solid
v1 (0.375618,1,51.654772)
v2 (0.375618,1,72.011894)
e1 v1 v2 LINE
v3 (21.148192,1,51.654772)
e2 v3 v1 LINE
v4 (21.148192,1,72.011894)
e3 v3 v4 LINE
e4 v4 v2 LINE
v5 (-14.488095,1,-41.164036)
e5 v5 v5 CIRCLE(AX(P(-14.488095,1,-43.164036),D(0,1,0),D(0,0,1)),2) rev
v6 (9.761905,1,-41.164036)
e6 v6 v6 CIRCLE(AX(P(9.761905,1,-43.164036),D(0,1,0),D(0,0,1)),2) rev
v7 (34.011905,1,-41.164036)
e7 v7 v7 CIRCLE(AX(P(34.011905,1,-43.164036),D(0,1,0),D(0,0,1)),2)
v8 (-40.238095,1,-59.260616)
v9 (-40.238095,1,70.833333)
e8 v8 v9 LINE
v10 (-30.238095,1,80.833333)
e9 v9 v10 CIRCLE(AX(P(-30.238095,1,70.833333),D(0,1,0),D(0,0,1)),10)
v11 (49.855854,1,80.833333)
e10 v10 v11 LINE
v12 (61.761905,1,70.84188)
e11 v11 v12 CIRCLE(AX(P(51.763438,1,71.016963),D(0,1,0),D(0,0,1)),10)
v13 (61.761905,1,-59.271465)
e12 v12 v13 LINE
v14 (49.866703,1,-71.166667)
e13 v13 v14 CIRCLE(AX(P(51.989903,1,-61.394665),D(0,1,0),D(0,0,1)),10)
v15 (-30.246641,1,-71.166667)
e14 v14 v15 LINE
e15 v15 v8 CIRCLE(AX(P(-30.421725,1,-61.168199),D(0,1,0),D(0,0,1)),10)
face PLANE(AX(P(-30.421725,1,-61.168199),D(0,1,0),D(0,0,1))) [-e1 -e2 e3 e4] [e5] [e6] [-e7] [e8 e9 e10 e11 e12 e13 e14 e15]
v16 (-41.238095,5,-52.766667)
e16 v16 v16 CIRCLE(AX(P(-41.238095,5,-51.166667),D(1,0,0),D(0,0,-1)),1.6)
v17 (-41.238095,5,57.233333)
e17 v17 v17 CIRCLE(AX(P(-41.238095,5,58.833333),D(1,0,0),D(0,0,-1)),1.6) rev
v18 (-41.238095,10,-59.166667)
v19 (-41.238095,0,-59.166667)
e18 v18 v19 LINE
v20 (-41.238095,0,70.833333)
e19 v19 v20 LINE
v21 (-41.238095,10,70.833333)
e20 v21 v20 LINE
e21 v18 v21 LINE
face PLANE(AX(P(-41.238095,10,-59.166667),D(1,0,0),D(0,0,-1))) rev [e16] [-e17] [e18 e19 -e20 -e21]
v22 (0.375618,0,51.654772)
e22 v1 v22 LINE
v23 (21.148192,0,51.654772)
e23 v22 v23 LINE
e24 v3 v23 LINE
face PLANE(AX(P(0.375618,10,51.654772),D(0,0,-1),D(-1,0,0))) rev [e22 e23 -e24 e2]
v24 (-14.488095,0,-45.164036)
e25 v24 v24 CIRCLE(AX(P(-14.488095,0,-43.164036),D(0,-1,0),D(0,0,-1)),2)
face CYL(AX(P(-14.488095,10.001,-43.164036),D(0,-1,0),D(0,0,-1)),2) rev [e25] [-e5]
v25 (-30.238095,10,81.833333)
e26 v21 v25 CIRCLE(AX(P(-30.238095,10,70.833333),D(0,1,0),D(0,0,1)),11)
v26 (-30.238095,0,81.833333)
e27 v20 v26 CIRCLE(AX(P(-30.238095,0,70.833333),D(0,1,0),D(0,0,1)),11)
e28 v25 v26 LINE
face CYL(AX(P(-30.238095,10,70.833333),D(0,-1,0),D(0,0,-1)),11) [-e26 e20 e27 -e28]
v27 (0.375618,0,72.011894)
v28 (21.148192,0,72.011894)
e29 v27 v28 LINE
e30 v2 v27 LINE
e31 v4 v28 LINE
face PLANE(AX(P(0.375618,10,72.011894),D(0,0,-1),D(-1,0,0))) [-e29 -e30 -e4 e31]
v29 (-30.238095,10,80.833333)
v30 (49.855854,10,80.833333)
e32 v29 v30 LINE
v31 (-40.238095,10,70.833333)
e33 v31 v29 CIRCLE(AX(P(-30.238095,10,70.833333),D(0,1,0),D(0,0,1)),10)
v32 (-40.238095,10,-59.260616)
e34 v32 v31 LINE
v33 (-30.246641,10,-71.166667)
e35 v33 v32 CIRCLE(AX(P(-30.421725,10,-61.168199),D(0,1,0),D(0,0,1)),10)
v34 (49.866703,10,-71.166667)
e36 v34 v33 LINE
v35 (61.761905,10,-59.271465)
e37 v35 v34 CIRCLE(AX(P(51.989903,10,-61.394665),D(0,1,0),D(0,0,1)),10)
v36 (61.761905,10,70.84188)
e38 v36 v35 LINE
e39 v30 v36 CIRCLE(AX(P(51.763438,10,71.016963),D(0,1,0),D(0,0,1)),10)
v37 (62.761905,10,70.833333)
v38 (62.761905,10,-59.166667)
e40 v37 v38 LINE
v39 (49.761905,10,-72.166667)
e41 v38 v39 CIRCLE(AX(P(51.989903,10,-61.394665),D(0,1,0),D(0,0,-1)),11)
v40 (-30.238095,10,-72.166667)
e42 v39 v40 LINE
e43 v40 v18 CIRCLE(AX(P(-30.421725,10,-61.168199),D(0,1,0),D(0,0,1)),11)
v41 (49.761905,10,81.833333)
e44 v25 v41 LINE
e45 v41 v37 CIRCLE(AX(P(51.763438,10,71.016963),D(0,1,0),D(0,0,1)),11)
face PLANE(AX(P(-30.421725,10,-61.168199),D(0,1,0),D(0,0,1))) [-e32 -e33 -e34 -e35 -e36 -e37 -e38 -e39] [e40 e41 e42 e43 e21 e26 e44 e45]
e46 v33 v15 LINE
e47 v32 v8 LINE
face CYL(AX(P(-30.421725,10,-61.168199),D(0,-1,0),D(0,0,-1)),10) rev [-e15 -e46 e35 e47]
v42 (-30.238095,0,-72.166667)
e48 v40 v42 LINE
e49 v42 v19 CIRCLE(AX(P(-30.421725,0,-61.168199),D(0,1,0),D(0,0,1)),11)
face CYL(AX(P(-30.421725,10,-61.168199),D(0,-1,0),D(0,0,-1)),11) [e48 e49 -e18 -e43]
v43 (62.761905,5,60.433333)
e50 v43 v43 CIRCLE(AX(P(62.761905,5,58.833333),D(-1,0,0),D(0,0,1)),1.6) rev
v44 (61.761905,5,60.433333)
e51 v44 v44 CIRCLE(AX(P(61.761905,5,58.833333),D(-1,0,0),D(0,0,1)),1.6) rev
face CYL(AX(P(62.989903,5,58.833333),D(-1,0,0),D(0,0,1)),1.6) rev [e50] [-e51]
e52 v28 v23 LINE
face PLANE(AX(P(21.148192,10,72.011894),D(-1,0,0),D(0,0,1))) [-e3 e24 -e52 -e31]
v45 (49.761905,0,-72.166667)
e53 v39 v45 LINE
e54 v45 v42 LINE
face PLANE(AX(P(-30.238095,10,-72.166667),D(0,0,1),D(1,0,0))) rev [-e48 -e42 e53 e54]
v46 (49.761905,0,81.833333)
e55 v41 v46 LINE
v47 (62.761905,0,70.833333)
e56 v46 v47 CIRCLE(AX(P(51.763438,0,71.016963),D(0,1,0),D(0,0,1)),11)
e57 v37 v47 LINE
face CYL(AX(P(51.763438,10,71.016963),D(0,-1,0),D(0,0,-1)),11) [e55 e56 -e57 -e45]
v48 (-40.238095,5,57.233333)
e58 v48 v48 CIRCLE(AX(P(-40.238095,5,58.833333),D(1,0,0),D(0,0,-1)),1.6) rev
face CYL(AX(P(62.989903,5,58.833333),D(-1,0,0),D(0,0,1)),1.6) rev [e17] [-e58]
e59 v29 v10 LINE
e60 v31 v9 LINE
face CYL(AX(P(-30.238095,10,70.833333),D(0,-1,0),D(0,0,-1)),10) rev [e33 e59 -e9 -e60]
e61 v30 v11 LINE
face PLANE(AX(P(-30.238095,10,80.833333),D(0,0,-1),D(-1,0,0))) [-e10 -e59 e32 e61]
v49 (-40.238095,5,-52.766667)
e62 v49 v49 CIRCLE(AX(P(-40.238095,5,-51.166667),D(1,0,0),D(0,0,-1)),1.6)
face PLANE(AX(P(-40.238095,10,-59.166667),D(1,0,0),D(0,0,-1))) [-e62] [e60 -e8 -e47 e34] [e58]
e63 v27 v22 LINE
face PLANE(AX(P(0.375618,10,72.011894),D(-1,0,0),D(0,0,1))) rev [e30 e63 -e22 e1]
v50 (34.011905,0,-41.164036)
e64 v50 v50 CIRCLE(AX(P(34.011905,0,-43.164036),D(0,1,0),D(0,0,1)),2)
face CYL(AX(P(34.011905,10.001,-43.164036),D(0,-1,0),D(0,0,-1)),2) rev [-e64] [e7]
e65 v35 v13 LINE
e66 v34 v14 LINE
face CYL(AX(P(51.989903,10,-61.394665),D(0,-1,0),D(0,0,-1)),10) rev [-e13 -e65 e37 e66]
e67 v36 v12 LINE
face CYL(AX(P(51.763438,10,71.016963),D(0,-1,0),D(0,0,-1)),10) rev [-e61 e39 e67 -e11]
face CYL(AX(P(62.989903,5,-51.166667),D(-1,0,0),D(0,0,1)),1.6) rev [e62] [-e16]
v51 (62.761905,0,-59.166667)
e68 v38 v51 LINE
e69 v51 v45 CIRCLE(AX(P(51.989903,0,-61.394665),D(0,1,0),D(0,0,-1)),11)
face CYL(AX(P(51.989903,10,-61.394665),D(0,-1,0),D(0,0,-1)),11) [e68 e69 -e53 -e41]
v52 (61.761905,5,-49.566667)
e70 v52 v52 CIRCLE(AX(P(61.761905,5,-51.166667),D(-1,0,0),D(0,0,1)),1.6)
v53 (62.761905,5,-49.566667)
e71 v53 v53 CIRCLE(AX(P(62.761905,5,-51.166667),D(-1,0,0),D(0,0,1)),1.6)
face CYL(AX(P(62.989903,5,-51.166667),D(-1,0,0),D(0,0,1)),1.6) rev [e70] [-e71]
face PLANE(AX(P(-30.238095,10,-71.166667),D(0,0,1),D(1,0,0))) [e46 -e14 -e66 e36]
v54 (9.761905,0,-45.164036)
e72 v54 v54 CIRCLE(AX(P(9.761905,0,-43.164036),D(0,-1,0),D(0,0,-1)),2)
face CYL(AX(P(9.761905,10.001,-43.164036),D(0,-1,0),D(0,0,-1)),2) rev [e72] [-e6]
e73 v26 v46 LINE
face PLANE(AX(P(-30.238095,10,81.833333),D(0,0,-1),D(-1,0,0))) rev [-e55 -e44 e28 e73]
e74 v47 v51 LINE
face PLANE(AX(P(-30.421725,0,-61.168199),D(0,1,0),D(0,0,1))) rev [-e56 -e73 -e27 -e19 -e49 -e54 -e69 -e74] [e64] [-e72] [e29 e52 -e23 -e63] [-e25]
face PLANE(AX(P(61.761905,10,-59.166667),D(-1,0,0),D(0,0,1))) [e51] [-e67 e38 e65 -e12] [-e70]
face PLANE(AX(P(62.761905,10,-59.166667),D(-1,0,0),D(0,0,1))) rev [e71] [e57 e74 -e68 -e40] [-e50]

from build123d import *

# Parameters (mm, degrees)
EXTRUDE_1_DEPTH          = 10
SHELL_START              = 1
SHELL_5_DEPTH            = 9
CUT_EXTRUDE_1_DEPTH      = 134.004728562
CUT_EXTRUDE_1_DEPTH_BACK = 134.004728562
SKETCH_2_R               = 1.6
SKETCH_6_W               = 20.772573636
SKETCH_6_H               = 20.357122163
CUT_EXTRUDE_2_DEPTH      = 104.896631765
CUT_EXTRUDE_3_REACH      = 105.897
SKETCH_9_R               = 2


# Read off the part's stored shape, not the designer's step: 薄殼5
with BuildPart() as part:
    # 草圖1 → 填料-伸長1 (new body)
    with BuildSketch(Plane(origin=(0, 0, 0), x_dir=(1, 0, 0), z_dir=(0, 1, 0))):
        with BuildLine():
            Line((-41.238095238, 59.166666667), (-41.238095238, -70.833333333))
            ThreePointArc((-41.238095238, -70.833333333), (-38.016269831, -78.611507926), (-30.238095238, -81.833333333))
            Line((-30.238095238, -81.833333333), (49.761904762, -81.833333333))
            ThreePointArc((49.761904762, -81.833333333), (58.868802246, -79.414212178), (62.761904762, -70.833333333))
            Line((62.761904762, -70.833333333), (62.761904762, 59.166666667))
            ThreePointArc((62.761904762, 59.166666667), (59.768077482, 69.172839387), (49.761904762, 72.166666667))
            Line((49.761904762, 72.166666667), (-30.238095238, 72.166666667))
            ThreePointArc((-30.238095238, 72.166666667), (-38.818974083, 68.273564151), (-41.238095238, 59.166666667))
        make_face()
    extrude(amount=EXTRUDE_1_DEPTH)

    # 薄殼5 outline → 薄殼5 (cut)
    with BuildSketch(Plane(origin=(0, 0, 0), x_dir=(1, 0, 0), z_dir=(0, 1, 0)).offset(SHELL_START)):
        with BuildLine():
            ThreePointArc((-30.246641499, 71.166666667), (-38.08182369, 67.59648754), (-40.238095238, 59.260616141))
            Line((-40.238095238, 59.260616141), (-40.238095238, -70.833333333))
            ThreePointArc((-40.238095238, -70.833333333), (-37.30916305, -77.904401145), (-30.238095238, -80.833333333))
            Line((-30.238095238, -80.833333333), (49.855854237, -80.833333333))
            ThreePointArc((49.855854237, -80.833333333), (58.191725636, -78.677061785), (61.761904762, -70.841879594))
            Line((61.761904762, -70.841879594), (61.761904762, 59.271464521))
            ThreePointArc((61.761904762, 59.271464521), (59.060970701, 68.465732606), (49.866702616, 71.166666667))
            Line((49.866702616, 71.166666667), (-30.246641499, 71.166666667))
        make_face()
    extrude(amount=SHELL_5_DEPTH, mode=Mode.SUBTRACT)

    # 草圖2 → 除料-伸長1 (cut, two sides: drawn at the far end of the back side and taken through both)
    with BuildSketch(Plane.ZY.offset(41.238095238).offset(-CUT_EXTRUDE_1_DEPTH_BACK)):
        with Locations((-51.166666667, 5)):
            Circle(SKETCH_2_R)
        with Locations((58.833333333, 5)):
            Circle(SKETCH_2_R)
    extrude(amount=CUT_EXTRUDE_1_DEPTH + CUT_EXTRUDE_1_DEPTH_BACK, mode=Mode.SUBTRACT)

    # 草圖6 → 除料-伸長2 (cut, through all)
    with BuildSketch(Plane(origin=(0, 0, 0), x_dir=(-1, 0, 0), z_dir=(0, -1, 0))):
        with Locations((-10.761904762, -61.833333334)):
            Rectangle(SKETCH_6_W, SKETCH_6_H)
    extrude(amount=-CUT_EXTRUDE_2_DEPTH, mode=Mode.SUBTRACT)

    # 草圖9 → 除料-伸長3 (cut, up to next)
    with BuildSketch(Plane.XZ, mode=Mode.PRIVATE) as cut_extrude_3_sk1:
        with Locations(Location((-14.488095238, -43.164036493, 0), (0, 0, 270))):
            Circle(SKETCH_9_R)
    cut_extrude_3_tool1 = extrude(cut_extrude_3_sk1.sketch, amount=-CUT_EXTRUDE_3_REACH, mode=Mode.PRIVATE) & part.part
    # 草圖9 → 除料-伸長3 (cut, up to next)
    with BuildSketch(Plane.XZ, mode=Mode.PRIVATE) as cut_extrude_3_sk2:
        with Locations(Location((34.011904762, -43.164036493, 0), (0, 0, 90))):
            Circle(SKETCH_9_R)
    cut_extrude_3_tool2 = extrude(cut_extrude_3_sk2.sketch, amount=-CUT_EXTRUDE_3_REACH, mode=Mode.PRIVATE) & part.part
    # 草圖9 → 除料-伸長3 (cut, up to next)
    with BuildSketch(Plane.XZ, mode=Mode.PRIVATE) as cut_extrude_3_sk3:
        with Locations(Location((9.761904762, -43.164036493, 0), (0, 0, 270))):
            Circle(SKETCH_9_R)
    cut_extrude_3_tool3 = extrude(cut_extrude_3_sk3.sketch, amount=-CUT_EXTRUDE_3_REACH, mode=Mode.PRIVATE) & part.part
    add(cut_extrude_3_tool1.solids().sort_by_distance((-14.488095, 0, -43.164036))[0], mode=Mode.SUBTRACT)
    add(cut_extrude_3_tool2.solids().sort_by_distance((34.011905, 0, -43.164036))[0], mode=Mode.SUBTRACT)
    add(cut_extrude_3_tool3.solids().sort_by_distance((9.761905, 0, -43.164036))[0], mode=Mode.SUBTRACT)


solid = part.part
